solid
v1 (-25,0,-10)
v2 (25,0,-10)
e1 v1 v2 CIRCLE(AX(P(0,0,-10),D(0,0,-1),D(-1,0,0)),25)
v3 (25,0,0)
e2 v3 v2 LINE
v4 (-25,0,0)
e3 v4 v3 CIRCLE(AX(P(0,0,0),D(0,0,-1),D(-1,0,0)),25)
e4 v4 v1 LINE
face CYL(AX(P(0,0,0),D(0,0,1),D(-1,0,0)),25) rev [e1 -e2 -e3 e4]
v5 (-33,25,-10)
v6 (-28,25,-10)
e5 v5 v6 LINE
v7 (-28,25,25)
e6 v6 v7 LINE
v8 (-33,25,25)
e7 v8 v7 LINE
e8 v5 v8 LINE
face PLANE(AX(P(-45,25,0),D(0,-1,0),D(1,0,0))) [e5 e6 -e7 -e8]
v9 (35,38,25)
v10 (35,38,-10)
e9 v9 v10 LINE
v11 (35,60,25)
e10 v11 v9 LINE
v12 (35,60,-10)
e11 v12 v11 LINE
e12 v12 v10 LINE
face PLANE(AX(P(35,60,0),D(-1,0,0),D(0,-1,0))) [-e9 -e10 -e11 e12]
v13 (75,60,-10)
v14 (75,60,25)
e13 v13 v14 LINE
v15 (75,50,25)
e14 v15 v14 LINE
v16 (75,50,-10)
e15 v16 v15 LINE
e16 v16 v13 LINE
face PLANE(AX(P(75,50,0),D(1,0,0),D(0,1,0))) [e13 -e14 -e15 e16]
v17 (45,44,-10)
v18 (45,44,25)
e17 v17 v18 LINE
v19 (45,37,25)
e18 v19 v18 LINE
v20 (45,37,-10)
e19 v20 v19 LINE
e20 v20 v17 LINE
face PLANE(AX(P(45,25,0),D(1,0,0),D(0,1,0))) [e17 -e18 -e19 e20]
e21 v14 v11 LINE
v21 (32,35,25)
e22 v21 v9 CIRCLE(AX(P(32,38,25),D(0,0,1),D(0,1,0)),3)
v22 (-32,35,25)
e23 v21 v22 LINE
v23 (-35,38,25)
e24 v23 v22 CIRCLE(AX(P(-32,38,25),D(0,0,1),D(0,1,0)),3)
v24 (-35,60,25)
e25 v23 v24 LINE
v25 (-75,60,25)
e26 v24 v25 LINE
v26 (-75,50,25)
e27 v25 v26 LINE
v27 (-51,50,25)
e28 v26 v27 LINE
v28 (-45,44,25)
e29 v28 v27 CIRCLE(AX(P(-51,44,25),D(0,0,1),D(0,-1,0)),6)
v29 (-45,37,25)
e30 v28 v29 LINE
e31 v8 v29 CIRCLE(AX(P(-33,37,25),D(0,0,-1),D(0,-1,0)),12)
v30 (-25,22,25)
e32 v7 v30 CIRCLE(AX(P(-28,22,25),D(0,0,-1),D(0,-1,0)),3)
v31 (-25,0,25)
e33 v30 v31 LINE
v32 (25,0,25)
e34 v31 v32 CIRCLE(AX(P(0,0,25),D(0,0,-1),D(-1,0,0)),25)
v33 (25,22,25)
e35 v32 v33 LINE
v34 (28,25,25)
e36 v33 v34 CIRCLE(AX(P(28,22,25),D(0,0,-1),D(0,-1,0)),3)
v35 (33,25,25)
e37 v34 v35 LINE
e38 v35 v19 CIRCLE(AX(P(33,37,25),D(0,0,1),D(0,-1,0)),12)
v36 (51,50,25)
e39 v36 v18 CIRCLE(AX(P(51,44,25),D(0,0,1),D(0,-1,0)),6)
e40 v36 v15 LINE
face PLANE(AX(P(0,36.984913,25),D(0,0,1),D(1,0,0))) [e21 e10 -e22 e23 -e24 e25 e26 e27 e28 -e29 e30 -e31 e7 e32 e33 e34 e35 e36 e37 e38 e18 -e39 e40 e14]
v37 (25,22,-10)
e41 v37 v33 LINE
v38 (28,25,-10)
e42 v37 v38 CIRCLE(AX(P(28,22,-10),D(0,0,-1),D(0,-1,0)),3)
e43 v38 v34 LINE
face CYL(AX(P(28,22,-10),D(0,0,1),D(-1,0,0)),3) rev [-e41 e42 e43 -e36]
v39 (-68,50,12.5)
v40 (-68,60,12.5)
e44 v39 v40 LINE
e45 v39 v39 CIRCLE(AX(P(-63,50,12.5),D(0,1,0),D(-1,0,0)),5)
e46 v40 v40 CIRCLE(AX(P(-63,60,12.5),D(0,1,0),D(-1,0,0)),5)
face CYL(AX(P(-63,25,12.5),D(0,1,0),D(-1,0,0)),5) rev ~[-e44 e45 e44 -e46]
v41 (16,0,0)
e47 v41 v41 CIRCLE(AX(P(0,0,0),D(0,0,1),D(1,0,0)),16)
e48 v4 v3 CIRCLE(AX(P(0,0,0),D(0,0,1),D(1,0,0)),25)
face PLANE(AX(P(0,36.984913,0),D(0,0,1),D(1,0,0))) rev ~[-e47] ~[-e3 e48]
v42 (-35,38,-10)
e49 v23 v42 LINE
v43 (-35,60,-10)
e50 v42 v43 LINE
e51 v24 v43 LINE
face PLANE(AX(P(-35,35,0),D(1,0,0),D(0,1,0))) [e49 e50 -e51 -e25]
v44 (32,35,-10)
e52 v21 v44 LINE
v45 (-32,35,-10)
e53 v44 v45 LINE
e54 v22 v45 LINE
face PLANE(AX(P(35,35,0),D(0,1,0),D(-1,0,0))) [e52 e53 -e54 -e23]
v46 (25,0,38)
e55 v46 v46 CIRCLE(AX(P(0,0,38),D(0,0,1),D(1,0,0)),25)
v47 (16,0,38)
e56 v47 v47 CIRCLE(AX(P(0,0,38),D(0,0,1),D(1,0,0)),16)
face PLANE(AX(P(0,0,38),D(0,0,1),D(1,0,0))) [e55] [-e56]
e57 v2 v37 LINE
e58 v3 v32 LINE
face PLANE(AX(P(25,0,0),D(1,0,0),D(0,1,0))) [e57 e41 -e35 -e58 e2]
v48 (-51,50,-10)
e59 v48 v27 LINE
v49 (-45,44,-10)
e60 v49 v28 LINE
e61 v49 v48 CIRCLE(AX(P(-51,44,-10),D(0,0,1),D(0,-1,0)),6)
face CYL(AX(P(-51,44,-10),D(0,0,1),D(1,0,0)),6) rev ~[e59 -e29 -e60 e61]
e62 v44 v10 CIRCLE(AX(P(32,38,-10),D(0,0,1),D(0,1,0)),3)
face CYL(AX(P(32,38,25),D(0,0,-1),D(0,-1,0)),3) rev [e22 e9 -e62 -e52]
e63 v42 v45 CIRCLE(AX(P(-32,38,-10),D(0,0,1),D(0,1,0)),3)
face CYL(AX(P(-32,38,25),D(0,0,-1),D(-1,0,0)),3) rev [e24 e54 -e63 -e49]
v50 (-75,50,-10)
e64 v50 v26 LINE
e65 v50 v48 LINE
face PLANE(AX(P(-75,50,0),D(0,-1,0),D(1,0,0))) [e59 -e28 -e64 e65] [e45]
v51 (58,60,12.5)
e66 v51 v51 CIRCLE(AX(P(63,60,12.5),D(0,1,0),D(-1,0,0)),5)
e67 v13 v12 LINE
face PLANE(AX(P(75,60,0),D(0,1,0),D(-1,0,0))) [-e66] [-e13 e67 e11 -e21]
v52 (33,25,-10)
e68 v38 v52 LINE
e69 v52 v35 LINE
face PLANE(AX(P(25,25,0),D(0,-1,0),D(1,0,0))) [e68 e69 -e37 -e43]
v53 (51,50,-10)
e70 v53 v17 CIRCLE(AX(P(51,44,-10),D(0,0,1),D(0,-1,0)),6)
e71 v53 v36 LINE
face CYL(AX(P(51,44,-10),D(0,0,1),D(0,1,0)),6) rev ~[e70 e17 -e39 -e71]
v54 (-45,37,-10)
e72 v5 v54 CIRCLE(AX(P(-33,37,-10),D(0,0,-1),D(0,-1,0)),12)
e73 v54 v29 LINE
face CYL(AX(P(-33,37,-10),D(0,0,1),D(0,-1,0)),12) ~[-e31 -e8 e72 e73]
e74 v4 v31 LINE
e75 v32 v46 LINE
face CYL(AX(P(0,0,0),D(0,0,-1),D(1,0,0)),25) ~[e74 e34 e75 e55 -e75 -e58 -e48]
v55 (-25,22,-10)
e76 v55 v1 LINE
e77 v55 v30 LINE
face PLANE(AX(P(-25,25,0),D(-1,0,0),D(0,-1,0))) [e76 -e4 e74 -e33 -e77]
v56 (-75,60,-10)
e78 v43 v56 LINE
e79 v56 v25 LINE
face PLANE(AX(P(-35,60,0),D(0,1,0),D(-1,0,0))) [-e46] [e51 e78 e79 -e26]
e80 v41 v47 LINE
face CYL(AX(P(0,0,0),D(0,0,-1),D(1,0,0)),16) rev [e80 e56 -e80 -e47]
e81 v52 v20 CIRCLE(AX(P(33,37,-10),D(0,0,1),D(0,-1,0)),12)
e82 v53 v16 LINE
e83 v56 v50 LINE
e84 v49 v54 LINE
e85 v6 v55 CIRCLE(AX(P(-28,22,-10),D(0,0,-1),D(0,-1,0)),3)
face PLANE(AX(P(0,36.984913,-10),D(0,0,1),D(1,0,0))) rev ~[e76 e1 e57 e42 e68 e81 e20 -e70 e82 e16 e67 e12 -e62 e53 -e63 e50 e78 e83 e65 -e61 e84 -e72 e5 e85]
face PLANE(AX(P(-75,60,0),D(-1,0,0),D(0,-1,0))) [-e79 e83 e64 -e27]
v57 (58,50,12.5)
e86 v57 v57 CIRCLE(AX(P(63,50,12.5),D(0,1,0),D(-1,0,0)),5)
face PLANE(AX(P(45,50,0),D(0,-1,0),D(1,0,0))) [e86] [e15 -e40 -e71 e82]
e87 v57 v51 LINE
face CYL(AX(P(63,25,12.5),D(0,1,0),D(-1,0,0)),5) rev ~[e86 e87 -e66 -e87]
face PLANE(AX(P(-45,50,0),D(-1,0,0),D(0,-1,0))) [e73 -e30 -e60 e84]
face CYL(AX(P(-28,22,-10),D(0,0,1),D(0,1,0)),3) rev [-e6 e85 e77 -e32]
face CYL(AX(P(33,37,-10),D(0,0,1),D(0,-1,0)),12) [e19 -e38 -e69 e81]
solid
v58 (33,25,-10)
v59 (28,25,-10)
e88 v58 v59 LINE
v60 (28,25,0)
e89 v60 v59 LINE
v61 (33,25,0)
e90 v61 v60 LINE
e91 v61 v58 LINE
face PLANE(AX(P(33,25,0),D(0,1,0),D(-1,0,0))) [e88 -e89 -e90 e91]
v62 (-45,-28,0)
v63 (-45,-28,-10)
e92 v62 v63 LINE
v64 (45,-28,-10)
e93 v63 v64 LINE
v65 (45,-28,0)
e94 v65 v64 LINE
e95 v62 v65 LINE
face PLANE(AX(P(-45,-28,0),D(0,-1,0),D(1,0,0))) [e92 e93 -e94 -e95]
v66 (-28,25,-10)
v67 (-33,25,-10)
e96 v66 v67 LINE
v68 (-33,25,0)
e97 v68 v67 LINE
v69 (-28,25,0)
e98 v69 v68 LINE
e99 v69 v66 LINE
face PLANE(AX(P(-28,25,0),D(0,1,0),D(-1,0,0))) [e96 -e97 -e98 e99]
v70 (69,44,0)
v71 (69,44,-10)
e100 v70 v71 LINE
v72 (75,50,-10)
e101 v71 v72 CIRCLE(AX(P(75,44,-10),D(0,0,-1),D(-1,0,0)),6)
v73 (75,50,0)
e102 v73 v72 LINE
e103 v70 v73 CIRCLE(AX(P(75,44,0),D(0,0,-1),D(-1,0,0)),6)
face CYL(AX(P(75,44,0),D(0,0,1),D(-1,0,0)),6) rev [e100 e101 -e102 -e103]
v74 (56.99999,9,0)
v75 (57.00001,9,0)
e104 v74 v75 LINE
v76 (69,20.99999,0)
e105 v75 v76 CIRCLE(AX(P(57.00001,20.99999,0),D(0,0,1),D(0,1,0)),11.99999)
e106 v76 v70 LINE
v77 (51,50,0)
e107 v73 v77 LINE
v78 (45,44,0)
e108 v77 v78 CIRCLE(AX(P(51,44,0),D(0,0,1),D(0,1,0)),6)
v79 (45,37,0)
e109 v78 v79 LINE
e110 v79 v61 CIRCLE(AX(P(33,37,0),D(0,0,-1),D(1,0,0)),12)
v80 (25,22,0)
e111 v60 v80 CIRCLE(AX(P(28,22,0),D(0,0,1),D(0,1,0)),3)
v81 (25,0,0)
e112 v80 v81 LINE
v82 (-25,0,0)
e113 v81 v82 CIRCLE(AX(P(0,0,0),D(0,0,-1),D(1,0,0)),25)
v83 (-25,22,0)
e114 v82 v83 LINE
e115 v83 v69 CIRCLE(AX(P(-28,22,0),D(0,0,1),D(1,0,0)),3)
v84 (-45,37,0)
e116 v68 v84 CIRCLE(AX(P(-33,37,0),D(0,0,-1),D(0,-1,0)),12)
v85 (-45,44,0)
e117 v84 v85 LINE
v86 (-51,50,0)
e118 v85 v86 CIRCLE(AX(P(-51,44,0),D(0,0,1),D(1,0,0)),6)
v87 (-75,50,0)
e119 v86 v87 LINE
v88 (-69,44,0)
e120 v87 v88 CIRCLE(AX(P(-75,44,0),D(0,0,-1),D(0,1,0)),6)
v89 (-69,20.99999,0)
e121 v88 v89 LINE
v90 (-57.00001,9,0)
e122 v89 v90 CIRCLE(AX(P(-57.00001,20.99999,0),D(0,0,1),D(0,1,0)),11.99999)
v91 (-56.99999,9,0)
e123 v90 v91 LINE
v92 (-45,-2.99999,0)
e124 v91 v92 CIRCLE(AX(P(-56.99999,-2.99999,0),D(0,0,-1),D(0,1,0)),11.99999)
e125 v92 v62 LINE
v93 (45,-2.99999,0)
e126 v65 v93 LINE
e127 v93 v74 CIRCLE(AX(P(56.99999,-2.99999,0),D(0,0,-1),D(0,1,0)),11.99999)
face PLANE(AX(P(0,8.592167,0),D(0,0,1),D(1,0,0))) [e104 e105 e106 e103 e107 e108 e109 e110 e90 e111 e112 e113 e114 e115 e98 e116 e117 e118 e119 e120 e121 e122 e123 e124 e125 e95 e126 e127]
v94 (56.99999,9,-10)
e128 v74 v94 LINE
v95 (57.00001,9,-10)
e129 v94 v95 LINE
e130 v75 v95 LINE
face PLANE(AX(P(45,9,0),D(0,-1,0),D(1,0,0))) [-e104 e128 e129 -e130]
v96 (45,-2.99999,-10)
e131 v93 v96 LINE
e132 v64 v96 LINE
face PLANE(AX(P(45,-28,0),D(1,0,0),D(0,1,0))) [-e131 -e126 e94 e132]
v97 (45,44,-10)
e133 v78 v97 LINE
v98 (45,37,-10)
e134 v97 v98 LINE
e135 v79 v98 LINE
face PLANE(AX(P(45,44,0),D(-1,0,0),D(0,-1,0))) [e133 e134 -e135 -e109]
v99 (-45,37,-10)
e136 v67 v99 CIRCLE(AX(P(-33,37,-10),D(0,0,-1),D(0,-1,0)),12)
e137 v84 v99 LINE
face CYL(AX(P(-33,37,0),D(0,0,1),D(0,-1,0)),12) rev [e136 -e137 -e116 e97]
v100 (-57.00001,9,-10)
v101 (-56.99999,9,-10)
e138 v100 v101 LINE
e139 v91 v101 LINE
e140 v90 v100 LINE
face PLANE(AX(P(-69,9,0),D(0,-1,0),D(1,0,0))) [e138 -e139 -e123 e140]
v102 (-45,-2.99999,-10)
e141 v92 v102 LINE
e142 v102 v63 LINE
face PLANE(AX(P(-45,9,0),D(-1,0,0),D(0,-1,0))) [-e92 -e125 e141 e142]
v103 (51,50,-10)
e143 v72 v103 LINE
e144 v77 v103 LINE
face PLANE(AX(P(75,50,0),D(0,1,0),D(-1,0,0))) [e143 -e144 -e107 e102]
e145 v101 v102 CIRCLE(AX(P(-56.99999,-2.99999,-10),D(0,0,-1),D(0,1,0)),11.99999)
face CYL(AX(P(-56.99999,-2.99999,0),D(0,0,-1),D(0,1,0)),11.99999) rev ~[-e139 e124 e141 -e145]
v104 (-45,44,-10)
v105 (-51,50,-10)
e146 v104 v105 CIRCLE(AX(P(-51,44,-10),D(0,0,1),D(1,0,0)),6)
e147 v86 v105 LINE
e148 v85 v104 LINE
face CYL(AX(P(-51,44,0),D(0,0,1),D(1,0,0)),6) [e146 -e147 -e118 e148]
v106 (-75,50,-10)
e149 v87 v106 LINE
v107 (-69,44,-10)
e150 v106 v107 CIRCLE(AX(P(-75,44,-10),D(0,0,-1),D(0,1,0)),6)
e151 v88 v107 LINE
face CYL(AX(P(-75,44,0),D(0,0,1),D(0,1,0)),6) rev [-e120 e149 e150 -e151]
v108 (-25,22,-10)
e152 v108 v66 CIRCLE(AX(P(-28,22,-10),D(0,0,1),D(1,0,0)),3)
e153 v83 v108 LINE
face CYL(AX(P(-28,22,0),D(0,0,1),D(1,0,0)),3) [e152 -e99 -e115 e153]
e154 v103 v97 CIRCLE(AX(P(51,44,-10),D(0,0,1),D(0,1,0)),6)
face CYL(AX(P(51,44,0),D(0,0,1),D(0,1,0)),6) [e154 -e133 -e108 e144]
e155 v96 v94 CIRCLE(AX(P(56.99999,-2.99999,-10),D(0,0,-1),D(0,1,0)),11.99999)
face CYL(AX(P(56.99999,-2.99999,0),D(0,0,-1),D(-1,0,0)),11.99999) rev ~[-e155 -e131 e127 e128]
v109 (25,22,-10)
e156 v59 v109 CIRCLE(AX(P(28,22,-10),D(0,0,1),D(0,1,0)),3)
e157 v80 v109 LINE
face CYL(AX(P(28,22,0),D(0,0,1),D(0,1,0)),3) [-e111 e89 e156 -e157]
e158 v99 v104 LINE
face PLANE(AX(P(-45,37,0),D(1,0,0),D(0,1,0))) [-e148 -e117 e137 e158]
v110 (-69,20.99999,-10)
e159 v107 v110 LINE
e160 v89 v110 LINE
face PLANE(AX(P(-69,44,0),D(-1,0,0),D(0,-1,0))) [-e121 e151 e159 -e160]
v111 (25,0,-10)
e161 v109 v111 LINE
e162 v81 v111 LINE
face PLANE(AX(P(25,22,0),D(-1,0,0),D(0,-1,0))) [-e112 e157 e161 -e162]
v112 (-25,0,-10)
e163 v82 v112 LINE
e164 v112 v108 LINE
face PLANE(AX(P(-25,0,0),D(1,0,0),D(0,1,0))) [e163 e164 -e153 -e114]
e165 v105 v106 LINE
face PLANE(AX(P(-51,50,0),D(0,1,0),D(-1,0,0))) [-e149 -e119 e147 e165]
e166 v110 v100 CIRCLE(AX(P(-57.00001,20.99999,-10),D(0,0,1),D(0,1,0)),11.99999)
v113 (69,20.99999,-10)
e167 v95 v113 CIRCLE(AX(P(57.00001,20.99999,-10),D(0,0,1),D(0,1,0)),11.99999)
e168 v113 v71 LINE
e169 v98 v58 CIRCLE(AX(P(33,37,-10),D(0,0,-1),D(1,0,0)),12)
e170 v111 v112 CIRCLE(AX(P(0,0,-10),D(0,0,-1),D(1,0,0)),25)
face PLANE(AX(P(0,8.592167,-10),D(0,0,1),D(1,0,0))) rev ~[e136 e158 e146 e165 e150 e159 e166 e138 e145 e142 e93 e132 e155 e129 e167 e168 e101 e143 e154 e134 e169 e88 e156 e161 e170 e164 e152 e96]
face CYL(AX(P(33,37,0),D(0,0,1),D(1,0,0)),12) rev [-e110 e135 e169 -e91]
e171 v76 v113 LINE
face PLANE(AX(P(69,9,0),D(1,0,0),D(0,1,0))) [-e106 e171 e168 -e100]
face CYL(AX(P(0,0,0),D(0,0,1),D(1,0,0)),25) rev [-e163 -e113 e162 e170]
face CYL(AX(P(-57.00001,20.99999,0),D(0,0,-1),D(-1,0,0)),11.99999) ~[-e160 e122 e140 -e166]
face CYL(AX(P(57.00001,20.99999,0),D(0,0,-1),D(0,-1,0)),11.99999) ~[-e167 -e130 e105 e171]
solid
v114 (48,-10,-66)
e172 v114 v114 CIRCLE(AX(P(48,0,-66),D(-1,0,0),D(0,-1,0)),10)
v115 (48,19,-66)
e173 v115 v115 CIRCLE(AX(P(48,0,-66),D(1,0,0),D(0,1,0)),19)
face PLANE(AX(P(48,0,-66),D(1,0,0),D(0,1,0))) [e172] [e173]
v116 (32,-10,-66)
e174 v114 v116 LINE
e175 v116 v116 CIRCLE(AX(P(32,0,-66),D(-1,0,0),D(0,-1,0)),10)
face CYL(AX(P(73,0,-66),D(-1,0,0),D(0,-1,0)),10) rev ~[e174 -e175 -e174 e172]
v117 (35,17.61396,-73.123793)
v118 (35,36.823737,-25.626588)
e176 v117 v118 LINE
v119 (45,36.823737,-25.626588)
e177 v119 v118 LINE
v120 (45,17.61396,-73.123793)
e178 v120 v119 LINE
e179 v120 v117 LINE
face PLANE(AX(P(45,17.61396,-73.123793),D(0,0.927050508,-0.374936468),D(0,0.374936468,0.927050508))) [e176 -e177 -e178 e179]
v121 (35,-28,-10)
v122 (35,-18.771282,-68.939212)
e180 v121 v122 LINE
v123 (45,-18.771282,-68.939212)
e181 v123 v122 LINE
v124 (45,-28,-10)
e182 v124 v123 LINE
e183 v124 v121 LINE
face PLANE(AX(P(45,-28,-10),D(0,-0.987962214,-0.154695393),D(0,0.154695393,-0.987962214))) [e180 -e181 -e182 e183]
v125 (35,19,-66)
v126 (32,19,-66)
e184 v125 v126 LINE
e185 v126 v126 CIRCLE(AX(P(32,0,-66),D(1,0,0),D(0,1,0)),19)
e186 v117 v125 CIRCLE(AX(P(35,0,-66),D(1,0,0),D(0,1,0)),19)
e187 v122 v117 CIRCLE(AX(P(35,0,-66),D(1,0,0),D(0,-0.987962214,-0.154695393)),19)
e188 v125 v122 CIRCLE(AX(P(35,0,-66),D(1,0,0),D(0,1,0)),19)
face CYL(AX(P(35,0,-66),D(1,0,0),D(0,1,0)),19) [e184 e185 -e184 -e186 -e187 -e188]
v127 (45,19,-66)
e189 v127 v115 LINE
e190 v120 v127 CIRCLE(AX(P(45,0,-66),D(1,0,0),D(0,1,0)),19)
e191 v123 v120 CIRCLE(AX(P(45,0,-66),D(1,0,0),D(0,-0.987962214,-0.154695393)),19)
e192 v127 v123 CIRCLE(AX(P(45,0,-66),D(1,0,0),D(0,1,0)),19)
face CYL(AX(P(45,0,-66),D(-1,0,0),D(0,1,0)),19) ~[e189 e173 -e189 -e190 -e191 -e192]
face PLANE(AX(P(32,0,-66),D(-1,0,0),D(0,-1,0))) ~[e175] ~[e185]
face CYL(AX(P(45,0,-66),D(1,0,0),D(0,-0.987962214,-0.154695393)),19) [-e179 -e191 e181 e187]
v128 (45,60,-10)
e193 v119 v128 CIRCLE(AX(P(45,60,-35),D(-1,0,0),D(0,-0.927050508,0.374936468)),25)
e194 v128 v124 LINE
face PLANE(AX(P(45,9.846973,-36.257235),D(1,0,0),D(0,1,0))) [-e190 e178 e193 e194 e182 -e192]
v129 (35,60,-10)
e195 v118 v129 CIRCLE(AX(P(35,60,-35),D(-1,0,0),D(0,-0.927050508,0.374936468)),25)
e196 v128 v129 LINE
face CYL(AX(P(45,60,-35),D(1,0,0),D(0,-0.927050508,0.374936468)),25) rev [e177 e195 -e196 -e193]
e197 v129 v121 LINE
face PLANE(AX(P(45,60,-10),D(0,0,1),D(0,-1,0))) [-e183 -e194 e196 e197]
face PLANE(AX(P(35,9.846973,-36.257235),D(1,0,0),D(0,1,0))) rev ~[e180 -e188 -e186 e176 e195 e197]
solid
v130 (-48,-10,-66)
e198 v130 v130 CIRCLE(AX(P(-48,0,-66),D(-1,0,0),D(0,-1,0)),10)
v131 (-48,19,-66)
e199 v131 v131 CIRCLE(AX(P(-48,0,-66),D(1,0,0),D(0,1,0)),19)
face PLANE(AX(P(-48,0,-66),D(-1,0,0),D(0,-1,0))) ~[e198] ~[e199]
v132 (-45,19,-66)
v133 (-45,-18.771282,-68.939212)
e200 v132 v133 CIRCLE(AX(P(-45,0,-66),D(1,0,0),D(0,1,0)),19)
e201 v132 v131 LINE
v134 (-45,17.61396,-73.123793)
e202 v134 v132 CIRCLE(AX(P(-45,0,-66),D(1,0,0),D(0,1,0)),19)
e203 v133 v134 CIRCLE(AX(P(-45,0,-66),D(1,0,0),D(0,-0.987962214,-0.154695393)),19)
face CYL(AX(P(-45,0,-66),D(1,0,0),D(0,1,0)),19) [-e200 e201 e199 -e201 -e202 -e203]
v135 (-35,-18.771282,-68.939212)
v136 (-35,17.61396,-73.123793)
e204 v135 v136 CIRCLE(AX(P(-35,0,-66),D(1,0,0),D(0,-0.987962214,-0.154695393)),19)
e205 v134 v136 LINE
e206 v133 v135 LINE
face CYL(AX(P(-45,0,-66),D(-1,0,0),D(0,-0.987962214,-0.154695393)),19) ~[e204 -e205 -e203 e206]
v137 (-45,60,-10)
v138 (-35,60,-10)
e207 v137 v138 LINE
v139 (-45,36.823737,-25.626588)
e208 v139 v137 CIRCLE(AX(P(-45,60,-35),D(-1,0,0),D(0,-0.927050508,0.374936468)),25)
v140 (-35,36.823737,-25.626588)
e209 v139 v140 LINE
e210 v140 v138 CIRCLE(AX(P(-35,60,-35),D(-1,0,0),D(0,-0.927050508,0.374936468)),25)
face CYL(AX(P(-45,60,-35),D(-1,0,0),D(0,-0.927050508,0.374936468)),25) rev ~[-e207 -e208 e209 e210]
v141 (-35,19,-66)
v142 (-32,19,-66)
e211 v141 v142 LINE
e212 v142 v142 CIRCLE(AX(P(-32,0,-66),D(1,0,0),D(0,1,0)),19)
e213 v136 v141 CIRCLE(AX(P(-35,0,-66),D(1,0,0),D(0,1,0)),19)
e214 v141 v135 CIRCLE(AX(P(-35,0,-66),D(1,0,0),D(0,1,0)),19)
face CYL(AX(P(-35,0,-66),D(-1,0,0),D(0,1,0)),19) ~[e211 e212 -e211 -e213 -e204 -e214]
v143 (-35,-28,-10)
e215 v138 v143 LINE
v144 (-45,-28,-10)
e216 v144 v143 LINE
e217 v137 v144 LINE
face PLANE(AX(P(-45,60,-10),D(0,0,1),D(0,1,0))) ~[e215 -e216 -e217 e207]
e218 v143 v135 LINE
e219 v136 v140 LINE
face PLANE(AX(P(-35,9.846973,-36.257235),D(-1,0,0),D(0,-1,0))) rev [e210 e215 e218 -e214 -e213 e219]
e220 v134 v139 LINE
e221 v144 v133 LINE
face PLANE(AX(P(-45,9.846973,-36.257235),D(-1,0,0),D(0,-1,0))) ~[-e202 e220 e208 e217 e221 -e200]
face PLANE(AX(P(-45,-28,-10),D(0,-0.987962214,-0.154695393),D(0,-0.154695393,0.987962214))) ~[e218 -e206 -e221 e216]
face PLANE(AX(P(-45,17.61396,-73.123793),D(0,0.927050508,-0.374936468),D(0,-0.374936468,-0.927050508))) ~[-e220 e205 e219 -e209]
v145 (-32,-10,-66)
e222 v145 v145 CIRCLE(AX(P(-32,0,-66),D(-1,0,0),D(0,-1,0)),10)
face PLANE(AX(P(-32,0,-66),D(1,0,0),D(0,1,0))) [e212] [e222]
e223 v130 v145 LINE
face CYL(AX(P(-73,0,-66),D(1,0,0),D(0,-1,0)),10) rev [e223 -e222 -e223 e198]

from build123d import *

# Parameters (mm, degrees)
F0_R          = 25
F0_R_2        = 16
F1_DEPTH      = 38
F3_DEPTH      = 25
F3_DEPTH_BACK = 10
F4_R          = 6
F5_R          = 3
F6_R          = 12
F8_DEPTH      = 10
F9_R          = 11.99999
F11_DEPTH     = 10
F12_R         = 19
F13_DEPTH     = 3
F17_D         = 20
F17_DEPTH     = 25
F17_TIP       = 6.0086061903
F20_D         = 10
F20_DEPTH     = 25
F20_TIP       = 3.0043030951


# Not quite as in the source:
# - a fillet or chamfer is up to 0.001 mm smaller than in the source, because OpenCascade refuses the exact size


with BuildPart() as f1:
    # F0 (on Top) → F1 (new body)
    with BuildSketch(Plane.XY):
        Circle(F0_R)
        Circle(F0_R_2, mode=Mode.SUBTRACT)
    extrude(amount=F1_DEPTH)

    # F2 (on Top) → F3 (join, two sides)
    with BuildSketch(Plane.XY) as f3_sk:
        with BuildLine():
            Line((-35, 60), (-75, 60))
            Line((-75, 60), (-75, 50))
            Line((-75, 50), (-45, 50))
            Line((-45, 50), (-45, 25))
            Line((-45, 25), (-25, 25))
            Line((-25, 25), (-25, 0))
            ThreePointArc((-25, 0), (0, 25), (25, 0))
            Line((25, 0), (25, 25))
            Line((25, 25), (45, 25))
            Line((45, 25), (45, 50))
            Line((45, 50), (75, 50))
            Line((75, 50), (75, 60))
            Line((75, 60), (35, 60))
            Line((35, 60), (35, 35))
            Line((35, 35), (0, 35))
            Line((0, 35), (-35, 35))
            Line((-35, 35), (-35, 60))
        make_face()
    extrude(amount=F3_DEPTH)
    extrude(f3_sk.sketch, amount=-F3_DEPTH_BACK)

    # F4
    f4_edges = [f1.edges().sort_by_distance(p)[0] for p in [
        (45, 50, 7.5),
        (-45, 50, 7.5),
    ]]
    fillet(f4_edges, radius=F4_R)

    # F5
    f5_edges = [f1.edges().sort_by_distance(p)[0] for p in [
        (25, 25, 7.5),
        (-25, 25, 7.5),
        (-35, 35, 7.5),
        (35, 35, 7.5),
    ]]
    fillet(f5_edges, radius=F5_R)

    # F6
    f6_edges = [f1.edges().sort_by_distance(p)[0] for p in [
        (-45, 25, 7.5),
        (45, 25, 7.5),
    ]]
    fillet(f6_edges, radius=F6_R)

    # F20
    with Locations(Plane.XZ.offset(-50)):
        with Locations((-63, 12.5), (63, 12.5)):
            Hole(F20_D / 2, depth=F20_DEPTH)
            with Locations((0, 0, -(F20_DEPTH + F20_TIP / 2))):  # 118° drill point
                Cone(0, F20_D / 2, F20_TIP, mode=Mode.SUBTRACT)


with BuildPart() as f8:
    # F7 (on Top) → F8 (new body)
    with BuildSketch(Plane.XY):
        with BuildLine():
            Line((-45, -28), (0, -28))
            Line((0, -28), (45, -28))
            Line((45, -28), (45, 9))
            Line((45, 9), (69, 9))
            Line((69, 9), (69, 44))
            ThreePointArc((69, 44), (70.7573593129, 48.2426406871), (75, 50))
            Line((75, 50), (51, 50))
            ThreePointArc((51, 50), (46.7573593129, 48.2426406871), (45, 44))
            Line((45, 44), (45, 37))
            ThreePointArc((45, 37), (41.4852813742, 28.5147186258), (33, 25))
            Line((33, 25), (28, 25))
            ThreePointArc((28, 25), (25.8786796564, 24.1213203436), (25, 22))
            Line((25, 22), (25, 0))
            ThreePointArc((25, 0), (0, -25), (-25, 0))
            Line((-25, 0), (-25, 22))
            ThreePointArc((-25, 22), (-25.8786796564, 24.1213203436), (-28, 25))
            Line((-28, 25), (-33, 25))
            ThreePointArc((-33, 25), (-41.4852813742, 28.5147186258), (-45, 37))
            Line((-45, 37), (-45, 44))
            ThreePointArc((-45, 44), (-46.7573593129, 48.2426406871), (-51, 50))
            Line((-51, 50), (-75, 50))
            ThreePointArc((-75, 50), (-70.7573593129, 48.2426406871), (-69, 44))
            Line((-69, 44), (-69, 9))
            Line((-69, 9), (-45, 9))
            Line((-45, 9), (-45, -28))
        make_face()
    extrude(amount=-F8_DEPTH)

    # F9 (radius 12 in the source; OpenCascade refuses exactly that, so slightly less here)
    f9_edges = [f8.edges().sort_by_distance(p)[0] for p in [
        (-69, 9, -5),
        (-45, 9, -5),
        (45, 9, -5),
        (69, 9, -5),
    ]]
    fillet(f9_edges, radius=F9_R)


with BuildPart() as f11:
    # F10 (on face) → F11 (new body)
    with BuildSketch(Plane.YZ.offset(45)):
        with BuildLine():
            Line((-28, -10), (-18.7712820587, -68.9392124579))
            ThreePointArc((-18.7712820587, -68.9392124579), (-2.1708355833, -84.8755787427), (17.6139596592, -73.1237928888))
            Line((17.6139596592, -73.1237928888), (36.8237372905, -25.6265883042))
            ThreePointArc((36.8237372905, -25.6265883042), (46.0238648475, -14.2715739575), (60, -10))
            Line((60, -10), (50, -10))
            Line((50, -10), (44, -10))
            Line((44, -10), (21, -10))
            Line((21, -10), (9, -10))
            Line((9, -10), (-3, -10))
            Line((-3, -10), (-28, -10))
        make_face()
    extrude(amount=-F11_DEPTH)

    # F12 (on face) → F13 (join)
    with BuildSketch(Plane.YZ.offset(45)):
        with Locations((0, -66)):
            Circle(F12_R)
    extrude(amount=F13_DEPTH)

    # F15: F11 across plane


with BuildPart() as f11_1:
    add(f11.part)
    add(f11.part.mirror(Plane(origin=(40, 0, -66), x_dir=(0, 1, 0), z_dir=(1, 0, 0))))

    # F17
    with Locations(Plane.YZ.offset(48)):
        with Locations((0, -66)):
            Hole(F17_D / 2, depth=F17_DEPTH)
            with Locations((0, 0, -(F17_DEPTH + F17_TIP / 2))):  # 118° drill point
                Cone(0, F17_D / 2, F17_TIP, mode=Mode.SUBTRACT)


with BuildPart() as f18_1:
    # F18: instance of F11
    add(f11_1.part.mirror(Plane.YZ))


solid = Compound([f1.part, f8.part, f11_1.part, f18_1.part])
